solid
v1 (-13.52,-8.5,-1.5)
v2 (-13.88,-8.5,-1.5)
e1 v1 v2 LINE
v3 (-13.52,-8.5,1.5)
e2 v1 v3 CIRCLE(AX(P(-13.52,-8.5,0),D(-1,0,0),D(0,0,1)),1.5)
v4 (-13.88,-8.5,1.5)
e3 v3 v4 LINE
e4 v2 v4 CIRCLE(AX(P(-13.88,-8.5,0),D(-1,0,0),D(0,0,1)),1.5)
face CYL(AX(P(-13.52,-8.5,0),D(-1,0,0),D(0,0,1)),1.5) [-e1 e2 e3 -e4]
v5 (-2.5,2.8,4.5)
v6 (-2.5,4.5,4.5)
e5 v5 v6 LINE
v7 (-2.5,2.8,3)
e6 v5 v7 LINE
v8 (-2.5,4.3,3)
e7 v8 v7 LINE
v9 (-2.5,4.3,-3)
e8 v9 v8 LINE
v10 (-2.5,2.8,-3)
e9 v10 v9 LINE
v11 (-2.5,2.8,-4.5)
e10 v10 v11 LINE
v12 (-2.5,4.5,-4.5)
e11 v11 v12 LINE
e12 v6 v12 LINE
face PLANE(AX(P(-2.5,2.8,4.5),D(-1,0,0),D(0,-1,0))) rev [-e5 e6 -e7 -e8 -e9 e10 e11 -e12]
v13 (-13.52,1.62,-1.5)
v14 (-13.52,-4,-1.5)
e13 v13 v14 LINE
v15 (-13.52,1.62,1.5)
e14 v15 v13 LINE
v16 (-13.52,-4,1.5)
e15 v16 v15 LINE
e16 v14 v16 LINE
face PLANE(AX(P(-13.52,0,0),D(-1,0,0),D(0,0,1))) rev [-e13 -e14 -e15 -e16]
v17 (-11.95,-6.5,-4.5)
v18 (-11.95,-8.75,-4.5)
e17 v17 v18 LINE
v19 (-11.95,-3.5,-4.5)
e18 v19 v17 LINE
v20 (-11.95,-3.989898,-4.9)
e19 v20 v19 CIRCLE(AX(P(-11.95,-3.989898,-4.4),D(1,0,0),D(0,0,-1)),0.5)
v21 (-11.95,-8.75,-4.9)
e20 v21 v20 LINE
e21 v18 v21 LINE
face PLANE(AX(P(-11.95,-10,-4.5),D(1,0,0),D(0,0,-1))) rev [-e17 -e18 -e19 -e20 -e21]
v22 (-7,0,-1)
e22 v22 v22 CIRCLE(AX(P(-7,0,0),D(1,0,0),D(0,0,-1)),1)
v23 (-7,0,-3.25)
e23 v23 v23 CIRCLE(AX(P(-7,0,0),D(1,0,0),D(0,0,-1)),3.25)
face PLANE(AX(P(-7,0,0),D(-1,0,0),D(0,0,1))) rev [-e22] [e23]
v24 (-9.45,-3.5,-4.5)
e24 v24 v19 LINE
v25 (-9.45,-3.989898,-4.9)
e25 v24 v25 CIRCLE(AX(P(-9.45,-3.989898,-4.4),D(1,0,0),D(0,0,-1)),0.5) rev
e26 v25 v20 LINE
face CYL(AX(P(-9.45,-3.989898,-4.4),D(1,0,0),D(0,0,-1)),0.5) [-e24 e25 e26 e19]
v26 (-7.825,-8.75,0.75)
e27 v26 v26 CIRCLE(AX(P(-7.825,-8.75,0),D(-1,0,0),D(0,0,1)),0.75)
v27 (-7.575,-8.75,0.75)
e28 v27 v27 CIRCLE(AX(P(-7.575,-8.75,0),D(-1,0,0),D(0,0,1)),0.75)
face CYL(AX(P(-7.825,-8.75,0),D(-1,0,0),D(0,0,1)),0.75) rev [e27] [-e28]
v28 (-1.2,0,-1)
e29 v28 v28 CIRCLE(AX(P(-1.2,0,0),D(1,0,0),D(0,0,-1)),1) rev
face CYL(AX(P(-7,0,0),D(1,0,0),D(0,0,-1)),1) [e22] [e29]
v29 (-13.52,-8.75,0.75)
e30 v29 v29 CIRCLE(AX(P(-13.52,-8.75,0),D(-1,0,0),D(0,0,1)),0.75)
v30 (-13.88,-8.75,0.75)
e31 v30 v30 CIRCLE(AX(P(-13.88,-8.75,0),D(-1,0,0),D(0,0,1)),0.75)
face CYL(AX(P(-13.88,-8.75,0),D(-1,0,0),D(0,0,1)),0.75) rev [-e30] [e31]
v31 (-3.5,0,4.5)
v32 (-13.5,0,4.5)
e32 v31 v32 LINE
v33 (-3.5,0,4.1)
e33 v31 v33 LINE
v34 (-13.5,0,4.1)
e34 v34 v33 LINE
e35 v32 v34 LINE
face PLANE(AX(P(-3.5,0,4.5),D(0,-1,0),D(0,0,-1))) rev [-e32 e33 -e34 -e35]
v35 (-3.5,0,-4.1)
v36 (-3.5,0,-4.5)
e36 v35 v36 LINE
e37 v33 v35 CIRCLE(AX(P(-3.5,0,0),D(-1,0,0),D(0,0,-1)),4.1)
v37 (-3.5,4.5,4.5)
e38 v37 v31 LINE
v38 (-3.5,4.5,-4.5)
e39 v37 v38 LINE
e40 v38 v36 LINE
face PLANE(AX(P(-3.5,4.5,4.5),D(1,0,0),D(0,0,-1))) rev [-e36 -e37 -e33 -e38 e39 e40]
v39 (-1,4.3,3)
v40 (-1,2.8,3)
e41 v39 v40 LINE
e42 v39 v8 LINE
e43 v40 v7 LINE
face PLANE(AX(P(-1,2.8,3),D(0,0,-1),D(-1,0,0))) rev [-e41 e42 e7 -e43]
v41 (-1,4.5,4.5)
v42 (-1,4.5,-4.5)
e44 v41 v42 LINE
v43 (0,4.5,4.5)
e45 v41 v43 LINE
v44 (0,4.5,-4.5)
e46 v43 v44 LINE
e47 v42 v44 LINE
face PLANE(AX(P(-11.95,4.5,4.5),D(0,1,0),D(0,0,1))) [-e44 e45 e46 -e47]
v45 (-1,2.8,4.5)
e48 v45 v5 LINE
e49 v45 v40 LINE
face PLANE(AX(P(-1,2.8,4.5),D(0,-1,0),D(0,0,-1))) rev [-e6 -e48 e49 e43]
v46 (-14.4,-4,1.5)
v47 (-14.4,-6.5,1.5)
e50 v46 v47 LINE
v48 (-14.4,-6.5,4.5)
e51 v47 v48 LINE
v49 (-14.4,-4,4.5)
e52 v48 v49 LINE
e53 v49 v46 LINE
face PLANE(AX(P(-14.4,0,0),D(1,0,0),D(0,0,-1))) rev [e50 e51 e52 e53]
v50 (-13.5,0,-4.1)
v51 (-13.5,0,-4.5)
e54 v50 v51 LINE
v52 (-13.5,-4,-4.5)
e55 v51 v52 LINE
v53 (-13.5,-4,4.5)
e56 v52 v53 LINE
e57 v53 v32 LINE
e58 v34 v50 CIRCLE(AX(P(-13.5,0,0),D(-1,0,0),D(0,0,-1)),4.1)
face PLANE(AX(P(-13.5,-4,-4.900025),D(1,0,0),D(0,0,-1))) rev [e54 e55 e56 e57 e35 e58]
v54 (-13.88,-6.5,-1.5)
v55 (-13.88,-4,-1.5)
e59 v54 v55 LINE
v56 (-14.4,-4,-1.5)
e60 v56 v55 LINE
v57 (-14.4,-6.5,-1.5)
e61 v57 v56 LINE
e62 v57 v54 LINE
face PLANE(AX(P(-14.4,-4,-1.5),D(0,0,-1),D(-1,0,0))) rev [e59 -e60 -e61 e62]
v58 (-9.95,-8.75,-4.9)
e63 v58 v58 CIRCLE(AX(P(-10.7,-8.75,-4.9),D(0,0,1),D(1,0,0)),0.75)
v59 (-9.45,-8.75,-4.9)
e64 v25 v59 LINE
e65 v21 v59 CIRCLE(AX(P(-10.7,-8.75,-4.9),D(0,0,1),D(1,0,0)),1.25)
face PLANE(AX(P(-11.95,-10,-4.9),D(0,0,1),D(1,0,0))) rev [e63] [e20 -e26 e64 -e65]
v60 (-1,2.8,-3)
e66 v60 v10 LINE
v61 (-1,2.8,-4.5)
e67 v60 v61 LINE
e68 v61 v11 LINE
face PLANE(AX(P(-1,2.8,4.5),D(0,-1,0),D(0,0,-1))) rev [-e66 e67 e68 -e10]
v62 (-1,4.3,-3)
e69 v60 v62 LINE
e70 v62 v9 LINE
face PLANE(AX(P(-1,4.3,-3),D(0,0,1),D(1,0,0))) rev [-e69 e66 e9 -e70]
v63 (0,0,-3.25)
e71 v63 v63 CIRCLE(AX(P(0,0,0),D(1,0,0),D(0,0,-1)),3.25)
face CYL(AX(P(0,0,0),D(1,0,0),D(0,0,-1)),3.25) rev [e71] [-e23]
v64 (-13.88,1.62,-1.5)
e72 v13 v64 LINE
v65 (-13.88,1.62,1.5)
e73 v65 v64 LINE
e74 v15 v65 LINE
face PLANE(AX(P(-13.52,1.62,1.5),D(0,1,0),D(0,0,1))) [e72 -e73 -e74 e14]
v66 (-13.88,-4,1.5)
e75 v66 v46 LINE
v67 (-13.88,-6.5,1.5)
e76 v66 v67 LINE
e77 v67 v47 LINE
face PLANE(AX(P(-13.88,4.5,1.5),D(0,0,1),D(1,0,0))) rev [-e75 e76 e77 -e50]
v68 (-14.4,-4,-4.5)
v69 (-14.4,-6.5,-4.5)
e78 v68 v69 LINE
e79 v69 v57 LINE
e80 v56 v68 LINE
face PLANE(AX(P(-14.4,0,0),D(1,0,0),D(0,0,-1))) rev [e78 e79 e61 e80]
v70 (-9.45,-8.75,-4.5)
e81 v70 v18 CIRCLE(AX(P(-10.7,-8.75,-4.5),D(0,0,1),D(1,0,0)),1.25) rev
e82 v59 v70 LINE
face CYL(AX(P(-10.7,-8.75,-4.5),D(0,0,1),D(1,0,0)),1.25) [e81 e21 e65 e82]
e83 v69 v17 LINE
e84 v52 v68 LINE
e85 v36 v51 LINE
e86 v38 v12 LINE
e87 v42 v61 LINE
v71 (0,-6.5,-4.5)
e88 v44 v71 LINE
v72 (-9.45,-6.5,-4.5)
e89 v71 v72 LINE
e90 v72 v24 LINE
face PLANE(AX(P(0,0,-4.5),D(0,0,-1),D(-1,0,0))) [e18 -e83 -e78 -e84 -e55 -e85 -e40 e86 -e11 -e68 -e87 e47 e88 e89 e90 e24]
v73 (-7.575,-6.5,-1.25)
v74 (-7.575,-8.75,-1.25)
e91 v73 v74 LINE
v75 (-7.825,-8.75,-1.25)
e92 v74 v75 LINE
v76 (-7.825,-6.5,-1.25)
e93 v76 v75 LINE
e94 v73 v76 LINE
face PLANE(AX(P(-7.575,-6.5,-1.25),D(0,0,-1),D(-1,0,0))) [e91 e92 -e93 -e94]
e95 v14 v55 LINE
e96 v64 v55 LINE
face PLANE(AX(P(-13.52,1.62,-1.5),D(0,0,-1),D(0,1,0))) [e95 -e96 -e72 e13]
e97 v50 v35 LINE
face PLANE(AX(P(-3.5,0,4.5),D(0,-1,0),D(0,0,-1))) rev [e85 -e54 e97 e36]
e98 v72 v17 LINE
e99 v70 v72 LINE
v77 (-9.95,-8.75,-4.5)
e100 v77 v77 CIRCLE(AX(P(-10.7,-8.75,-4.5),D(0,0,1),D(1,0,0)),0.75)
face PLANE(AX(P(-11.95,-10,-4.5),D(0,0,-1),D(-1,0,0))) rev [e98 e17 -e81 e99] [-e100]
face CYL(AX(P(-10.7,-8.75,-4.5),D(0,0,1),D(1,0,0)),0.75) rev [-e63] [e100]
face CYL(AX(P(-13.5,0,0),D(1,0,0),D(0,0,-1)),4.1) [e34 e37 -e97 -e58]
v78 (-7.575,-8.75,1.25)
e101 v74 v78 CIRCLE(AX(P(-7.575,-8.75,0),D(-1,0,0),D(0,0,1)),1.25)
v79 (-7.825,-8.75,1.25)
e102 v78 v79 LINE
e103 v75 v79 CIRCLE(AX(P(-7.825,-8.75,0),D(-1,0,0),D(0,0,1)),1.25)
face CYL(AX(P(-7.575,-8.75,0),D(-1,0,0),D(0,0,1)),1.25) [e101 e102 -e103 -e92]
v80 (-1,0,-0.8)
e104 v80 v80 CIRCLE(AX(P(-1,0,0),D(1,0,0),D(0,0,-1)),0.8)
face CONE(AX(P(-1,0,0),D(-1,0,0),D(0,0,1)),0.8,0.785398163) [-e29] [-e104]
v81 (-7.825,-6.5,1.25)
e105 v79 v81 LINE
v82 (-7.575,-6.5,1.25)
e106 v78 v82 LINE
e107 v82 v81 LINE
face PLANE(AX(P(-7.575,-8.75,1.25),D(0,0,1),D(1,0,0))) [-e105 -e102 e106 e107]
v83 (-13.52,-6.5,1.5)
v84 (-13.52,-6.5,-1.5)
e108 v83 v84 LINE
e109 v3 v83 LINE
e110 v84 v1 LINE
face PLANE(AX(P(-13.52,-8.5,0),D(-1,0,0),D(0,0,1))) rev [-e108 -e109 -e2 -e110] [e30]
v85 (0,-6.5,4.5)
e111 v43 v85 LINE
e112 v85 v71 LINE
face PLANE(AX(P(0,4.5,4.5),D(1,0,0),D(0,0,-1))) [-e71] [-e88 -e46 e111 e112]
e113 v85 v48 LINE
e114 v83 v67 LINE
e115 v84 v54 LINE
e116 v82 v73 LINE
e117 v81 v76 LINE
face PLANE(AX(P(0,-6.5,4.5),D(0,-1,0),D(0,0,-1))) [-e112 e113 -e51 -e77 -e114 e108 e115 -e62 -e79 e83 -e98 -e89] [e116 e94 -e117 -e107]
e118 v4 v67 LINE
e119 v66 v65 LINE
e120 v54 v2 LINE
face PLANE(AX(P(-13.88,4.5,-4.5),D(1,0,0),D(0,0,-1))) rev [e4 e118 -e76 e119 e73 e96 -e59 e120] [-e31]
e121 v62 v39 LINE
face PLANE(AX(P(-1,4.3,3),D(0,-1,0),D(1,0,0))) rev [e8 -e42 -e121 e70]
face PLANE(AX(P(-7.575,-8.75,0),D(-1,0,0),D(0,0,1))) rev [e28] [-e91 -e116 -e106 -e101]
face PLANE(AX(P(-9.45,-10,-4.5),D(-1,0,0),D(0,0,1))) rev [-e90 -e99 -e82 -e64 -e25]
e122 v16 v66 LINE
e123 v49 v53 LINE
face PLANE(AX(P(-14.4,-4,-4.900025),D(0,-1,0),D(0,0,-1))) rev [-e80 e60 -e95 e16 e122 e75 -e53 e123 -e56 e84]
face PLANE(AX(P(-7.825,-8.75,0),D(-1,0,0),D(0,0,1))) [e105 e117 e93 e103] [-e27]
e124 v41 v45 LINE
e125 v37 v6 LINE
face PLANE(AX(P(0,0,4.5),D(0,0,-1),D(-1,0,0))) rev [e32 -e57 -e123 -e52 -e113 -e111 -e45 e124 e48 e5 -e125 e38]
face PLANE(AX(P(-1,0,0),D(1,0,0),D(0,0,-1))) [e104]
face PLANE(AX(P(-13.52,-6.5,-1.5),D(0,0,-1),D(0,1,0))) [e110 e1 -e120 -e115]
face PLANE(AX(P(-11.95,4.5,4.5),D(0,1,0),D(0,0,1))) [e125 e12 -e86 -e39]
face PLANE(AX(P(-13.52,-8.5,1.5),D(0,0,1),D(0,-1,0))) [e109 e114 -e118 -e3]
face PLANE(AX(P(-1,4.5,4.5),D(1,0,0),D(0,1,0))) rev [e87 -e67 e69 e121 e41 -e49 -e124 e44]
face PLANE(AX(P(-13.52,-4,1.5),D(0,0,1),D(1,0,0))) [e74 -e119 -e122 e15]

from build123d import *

# Parameters (mm, degrees)
BOSS_EXTRUDE1_START            = -9
BOSS_EXTRUDE1_DEPTH            = 9
BOSS_EXTRUDE1_2_DEPTH          = 0.4
BOSS_EXTRUDE1_START_2          = -11.95
BOSS_EXTRUDE1_3_DEPTH          = 2.5
SKETCH2_W                      = 9
SKETCH2_H                      = 11
BOSS_EXTRUDE2_DEPTH            = 2.45
SKETCH3_W                      = 0.9
SKETCH3_H                      = 8.5
CUT_EXTRUDE1_DEPTH             = 20.892712233
SKETCH4_W                      = 0.52
SKETCH4_H                      = 6
CUT_EXTRUDE2_DEPTH             = 19.771520983
BOSS_EXTRUDE3_DEPTH            = 0.36
SKETCH6_W                      = 5.62
SKETCH6_H                      = 3
BOSS_EXTRUDE4_DEPTH            = 0.36
SKETCH7_W                      = 3
SKETCH7_H                      = 2.5
BOSS_EXTRUDE5_DEPTH            = 0.52
SKETCH8_W                      = 1.5
SKETCH8_H                      = 1.7
CUT_EXTRUDE3_DEPTH             = 20.7068516
SKETCH9_W                      = 6
SKETCH9_H                      = 1.5
BOSS_EXTRUDE6_DEPTH            = 1.5
SKETCH10_W                     = 10
SKETCH10_H                     = 4.5
CUT_EXTRUDE4_DEPTH             = 20.7068516
BOSS_EXTRUDE7_DEPTH            = 10
BOSS_EXTRUDE8_DEPTH            = 0.25
F_6_5_6_5_DIAMETER_HOLE1_D     = 6.5
F_6_5_6_5_DIAMETER_HOLE1_DEPTH = 7
SKETCH15_W                     = 6
SKETCH15_H                     = 1
SKETCH16_W                     = 0.75
SKETCH16_H                     = 7.825
F_1_5_1_5_DIAMETER_HOLE2_D     = 1.5
F_1_5_1_5_DIAMETER_HOLE3_D     = 1.5
F_1_5_1_5_DIAMETER_HOLE3_DEPTH = 13.88
CHAMFER1_SIZE                  = 0.2


with BuildPart() as part:
    # Boss-Extrude1: read off the stored shape, not the designer's step
    # Boss-Extrude1 outline → Boss-Extrude1 (new body)
    with BuildSketch(Plane(origin=(0, 0, -4.5), x_dir=(-1, 0, 0), z_dir=(0, 0, -1)).offset(BOSS_EXTRUDE1_START)):
        Polygon((11.95, -6.5), (11.95, 4.5), (0, 4.5), (0, -6.5), (9.45, -6.5), align=None)
    extrude(amount=BOSS_EXTRUDE1_DEPTH)

    # Boss-Extrude1 2 outline → Boss-Extrude1 2 (add)
    with BuildSketch(Plane(origin=(0, 0, -4.5), x_dir=(-1, 0, 0), z_dir=(0, 0, -1))):
        with BuildLine():
            Line((11.95, -8.75), (11.95, -6.5))
            Line((11.95, -6.5), (9.45, -6.5))
            Line((9.45, -6.5), (9.45, -8.75))
            ThreePointArc((9.45, -8.75), (10.7, -10), (11.95, -8.75))
        make_face()
    extrude(amount=BOSS_EXTRUDE1_2_DEPTH)

    # Boss-Extrude1 3 outline → Boss-Extrude1 3 (add)
    with BuildSketch(Plane.YZ.offset(BOSS_EXTRUDE1_START_2)):
        with BuildLine():
            Line((-6.5, -4.9), (-3.989897949, -4.9))
            ThreePointArc((-3.989897949, -4.9), (-3.673670183, -4.787298335), (-3.5, -4.5))
            Line((-3.5, -4.5), (-6.5, -4.5))
            Line((-6.5, -4.5), (-6.5, -4.9))
        make_face()
    extrude(amount=BOSS_EXTRUDE1_3_DEPTH)

    # Sketch2 → Boss-Extrude2 (add)
    with BuildSketch(Plane.ZY.offset(11.95)):
        with Locations((0, -1)):
            Rectangle(SKETCH2_W, SKETCH2_H)
    extrude(amount=BOSS_EXTRUDE2_DEPTH)

    # Sketch3 → Cut-Extrude1 (cut, through all)
    with BuildSketch(Plane.XY.offset(4.5)):
        with Locations((-13.95, 0.25)):
            Rectangle(SKETCH3_W, SKETCH3_H)
    extrude(amount=-CUT_EXTRUDE1_DEPTH, mode=Mode.SUBTRACT)

    # Sketch4 → Cut-Extrude2 (cut, through all)
    with BuildSketch(Plane.XZ.offset(6.5)):
        with Locations((-14.14, -1.5)):
            Rectangle(SKETCH4_W, SKETCH4_H)
    extrude(amount=-CUT_EXTRUDE2_DEPTH, mode=Mode.SUBTRACT)

    # Sketch5 → Boss-Extrude3 (add)
    with BuildSketch(Plane(origin=(-13.88, 0, 0), x_dir=(0, -1, 0), z_dir=(-1, 0, 0))):
        with BuildLine():
            Line((6.5, -1.5), (8.5, -1.5))
            ThreePointArc((8.5, -1.5), (10, 0), (8.5, 1.5))
            Line((8.5, 1.5), (6.5, 1.5))
            Line((6.5, 1.5), (6.5, -1.5))
        make_face()
    extrude(amount=-BOSS_EXTRUDE3_DEPTH)

    # Sketch6 → Boss-Extrude4 (add)
    with BuildSketch(Plane(origin=(-13.88, 0, 0), x_dir=(0, -1, 0), z_dir=(-1, 0, 0))):
        with Locations((1.19, 0)):
            Rectangle(SKETCH6_W, SKETCH6_H)
    extrude(amount=-BOSS_EXTRUDE4_DEPTH)

    # Sketch7 → Boss-Extrude5 (add)
    with BuildSketch(Plane.ZY.offset(13.88)):
        with Locations((-3, -5.25)):
            Rectangle(SKETCH7_W, SKETCH7_H)
    extrude(amount=BOSS_EXTRUDE5_DEPTH)

    # Sketch8 → Cut-Extrude3 (cut, through all)
    with BuildSketch(Plane(origin=(0, 0, -4.5), x_dir=(-1, 0, 0), z_dir=(0, 0, -1))):
        with Locations((1.75, 3.65)):
            Rectangle(SKETCH8_W, SKETCH8_H)
    extrude(amount=-CUT_EXTRUDE3_DEPTH, mode=Mode.SUBTRACT)

    # Sketch9 → Boss-Extrude6 (add)
    with BuildSketch(Plane(origin=(-2.5, 0, 0), x_dir=(0, 0, -1), z_dir=(1, 0, 0))):
        with Locations((0, 3.55)):
            Rectangle(SKETCH9_W, SKETCH9_H)
    extrude(amount=BOSS_EXTRUDE6_DEPTH)

    # Sketch10 → Cut-Extrude4 (cut, through all)
    with BuildSketch(Plane(origin=(0, 0, -4.5), x_dir=(-1, 0, 0), z_dir=(0, 0, -1))):
        with Locations((8.5, 2.25)):
            Rectangle(SKETCH10_W, SKETCH10_H)
    extrude(amount=-CUT_EXTRUDE4_DEPTH, mode=Mode.SUBTRACT)

    # Sketch11 → Boss-Extrude7 (add)
    with BuildSketch(Plane.ZY.offset(3.5)):
        with BuildLine():
            Line((4.1, 0), (-4.1, 0))
            ThreePointArc((-4.1, 0), (0, 4.1), (4.1, 0))
        make_face()
    extrude(amount=BOSS_EXTRUDE7_DEPTH)

    # Sketch12 → Boss-Extrude8 (add)
    with BuildSketch(Plane(origin=(-7.825, 0, 0), x_dir=(0, -1, 0), z_dir=(-1, 0, 0))):
        with BuildLine():
            Line((8.75, 1.25), (6.5, 1.25))
            Line((6.5, 1.25), (6.5, -1.25))
            Line((6.5, -1.25), (8.75, -1.25))
            ThreePointArc((8.75, -1.25), (10, 0), (8.75, 1.25))
        make_face()
    extrude(amount=-BOSS_EXTRUDE8_DEPTH)

    # Ø6.5 (6.5) Diameter Hole1
    with Locations(Plane(origin=(0, 0, 0), x_dir=(0, 0, -1), z_dir=(1, 0, 0))):
        with Locations((0, 0)):
            Hole(F_6_5_6_5_DIAMETER_HOLE1_D / 2, depth=F_6_5_6_5_DIAMETER_HOLE1_DEPTH)

    # Sketch15 → Revolve1 (revolve)
    with BuildSketch(Plane.XY, mode=Mode.PRIVATE) as revolve1_sk:
        with Locations((-4, 0.5)):
            Rectangle(SKETCH15_W, SKETCH15_H)
    revolve(revolve1_sk.sketch.rotate(Axis((-7, 0, 0), (1, 0, 0)), 270), axis=Axis((-7, 0, 0), (1, 0, 0)))

    # Sketch16 → Ø1.5 (1.5) Diameter Hole1 (revolve, cut)
    with BuildSketch(Plane(origin=(-7.825, -8.75, 0), x_dir=(0, 0, 1), z_dir=(0, 1, 0))):
        with Locations((0.375, 3.9125)):
            Rectangle(SKETCH16_W, SKETCH16_H)
    revolve(axis=Axis((-14.175, -8.75, 0), (1, 0, 0)), mode=Mode.SUBTRACT)

    # Ø1.5 (1.5) Diameter Hole2 (through all)
    with Locations(Plane.XY.offset(-4.5)):
        with Locations((-10.7, -8.75)):
            Hole(F_1_5_1_5_DIAMETER_HOLE2_D / 2)

    # Ø1.5 (1.5) Diameter Hole3
    with Locations(Plane.ZY.offset(13.88)):
        with Locations((0, -8.75)):
            Hole(F_1_5_1_5_DIAMETER_HOLE3_D / 2, depth=F_1_5_1_5_DIAMETER_HOLE3_DEPTH)

    # Chamfer1
    chamfer1_edges = [part.edges().sort_by_distance(p)[0] for p in [
        (-1, 0, 1),
    ]]
    chamfer(chamfer1_edges, length=CHAMFER1_SIZE)


solid = part.part
